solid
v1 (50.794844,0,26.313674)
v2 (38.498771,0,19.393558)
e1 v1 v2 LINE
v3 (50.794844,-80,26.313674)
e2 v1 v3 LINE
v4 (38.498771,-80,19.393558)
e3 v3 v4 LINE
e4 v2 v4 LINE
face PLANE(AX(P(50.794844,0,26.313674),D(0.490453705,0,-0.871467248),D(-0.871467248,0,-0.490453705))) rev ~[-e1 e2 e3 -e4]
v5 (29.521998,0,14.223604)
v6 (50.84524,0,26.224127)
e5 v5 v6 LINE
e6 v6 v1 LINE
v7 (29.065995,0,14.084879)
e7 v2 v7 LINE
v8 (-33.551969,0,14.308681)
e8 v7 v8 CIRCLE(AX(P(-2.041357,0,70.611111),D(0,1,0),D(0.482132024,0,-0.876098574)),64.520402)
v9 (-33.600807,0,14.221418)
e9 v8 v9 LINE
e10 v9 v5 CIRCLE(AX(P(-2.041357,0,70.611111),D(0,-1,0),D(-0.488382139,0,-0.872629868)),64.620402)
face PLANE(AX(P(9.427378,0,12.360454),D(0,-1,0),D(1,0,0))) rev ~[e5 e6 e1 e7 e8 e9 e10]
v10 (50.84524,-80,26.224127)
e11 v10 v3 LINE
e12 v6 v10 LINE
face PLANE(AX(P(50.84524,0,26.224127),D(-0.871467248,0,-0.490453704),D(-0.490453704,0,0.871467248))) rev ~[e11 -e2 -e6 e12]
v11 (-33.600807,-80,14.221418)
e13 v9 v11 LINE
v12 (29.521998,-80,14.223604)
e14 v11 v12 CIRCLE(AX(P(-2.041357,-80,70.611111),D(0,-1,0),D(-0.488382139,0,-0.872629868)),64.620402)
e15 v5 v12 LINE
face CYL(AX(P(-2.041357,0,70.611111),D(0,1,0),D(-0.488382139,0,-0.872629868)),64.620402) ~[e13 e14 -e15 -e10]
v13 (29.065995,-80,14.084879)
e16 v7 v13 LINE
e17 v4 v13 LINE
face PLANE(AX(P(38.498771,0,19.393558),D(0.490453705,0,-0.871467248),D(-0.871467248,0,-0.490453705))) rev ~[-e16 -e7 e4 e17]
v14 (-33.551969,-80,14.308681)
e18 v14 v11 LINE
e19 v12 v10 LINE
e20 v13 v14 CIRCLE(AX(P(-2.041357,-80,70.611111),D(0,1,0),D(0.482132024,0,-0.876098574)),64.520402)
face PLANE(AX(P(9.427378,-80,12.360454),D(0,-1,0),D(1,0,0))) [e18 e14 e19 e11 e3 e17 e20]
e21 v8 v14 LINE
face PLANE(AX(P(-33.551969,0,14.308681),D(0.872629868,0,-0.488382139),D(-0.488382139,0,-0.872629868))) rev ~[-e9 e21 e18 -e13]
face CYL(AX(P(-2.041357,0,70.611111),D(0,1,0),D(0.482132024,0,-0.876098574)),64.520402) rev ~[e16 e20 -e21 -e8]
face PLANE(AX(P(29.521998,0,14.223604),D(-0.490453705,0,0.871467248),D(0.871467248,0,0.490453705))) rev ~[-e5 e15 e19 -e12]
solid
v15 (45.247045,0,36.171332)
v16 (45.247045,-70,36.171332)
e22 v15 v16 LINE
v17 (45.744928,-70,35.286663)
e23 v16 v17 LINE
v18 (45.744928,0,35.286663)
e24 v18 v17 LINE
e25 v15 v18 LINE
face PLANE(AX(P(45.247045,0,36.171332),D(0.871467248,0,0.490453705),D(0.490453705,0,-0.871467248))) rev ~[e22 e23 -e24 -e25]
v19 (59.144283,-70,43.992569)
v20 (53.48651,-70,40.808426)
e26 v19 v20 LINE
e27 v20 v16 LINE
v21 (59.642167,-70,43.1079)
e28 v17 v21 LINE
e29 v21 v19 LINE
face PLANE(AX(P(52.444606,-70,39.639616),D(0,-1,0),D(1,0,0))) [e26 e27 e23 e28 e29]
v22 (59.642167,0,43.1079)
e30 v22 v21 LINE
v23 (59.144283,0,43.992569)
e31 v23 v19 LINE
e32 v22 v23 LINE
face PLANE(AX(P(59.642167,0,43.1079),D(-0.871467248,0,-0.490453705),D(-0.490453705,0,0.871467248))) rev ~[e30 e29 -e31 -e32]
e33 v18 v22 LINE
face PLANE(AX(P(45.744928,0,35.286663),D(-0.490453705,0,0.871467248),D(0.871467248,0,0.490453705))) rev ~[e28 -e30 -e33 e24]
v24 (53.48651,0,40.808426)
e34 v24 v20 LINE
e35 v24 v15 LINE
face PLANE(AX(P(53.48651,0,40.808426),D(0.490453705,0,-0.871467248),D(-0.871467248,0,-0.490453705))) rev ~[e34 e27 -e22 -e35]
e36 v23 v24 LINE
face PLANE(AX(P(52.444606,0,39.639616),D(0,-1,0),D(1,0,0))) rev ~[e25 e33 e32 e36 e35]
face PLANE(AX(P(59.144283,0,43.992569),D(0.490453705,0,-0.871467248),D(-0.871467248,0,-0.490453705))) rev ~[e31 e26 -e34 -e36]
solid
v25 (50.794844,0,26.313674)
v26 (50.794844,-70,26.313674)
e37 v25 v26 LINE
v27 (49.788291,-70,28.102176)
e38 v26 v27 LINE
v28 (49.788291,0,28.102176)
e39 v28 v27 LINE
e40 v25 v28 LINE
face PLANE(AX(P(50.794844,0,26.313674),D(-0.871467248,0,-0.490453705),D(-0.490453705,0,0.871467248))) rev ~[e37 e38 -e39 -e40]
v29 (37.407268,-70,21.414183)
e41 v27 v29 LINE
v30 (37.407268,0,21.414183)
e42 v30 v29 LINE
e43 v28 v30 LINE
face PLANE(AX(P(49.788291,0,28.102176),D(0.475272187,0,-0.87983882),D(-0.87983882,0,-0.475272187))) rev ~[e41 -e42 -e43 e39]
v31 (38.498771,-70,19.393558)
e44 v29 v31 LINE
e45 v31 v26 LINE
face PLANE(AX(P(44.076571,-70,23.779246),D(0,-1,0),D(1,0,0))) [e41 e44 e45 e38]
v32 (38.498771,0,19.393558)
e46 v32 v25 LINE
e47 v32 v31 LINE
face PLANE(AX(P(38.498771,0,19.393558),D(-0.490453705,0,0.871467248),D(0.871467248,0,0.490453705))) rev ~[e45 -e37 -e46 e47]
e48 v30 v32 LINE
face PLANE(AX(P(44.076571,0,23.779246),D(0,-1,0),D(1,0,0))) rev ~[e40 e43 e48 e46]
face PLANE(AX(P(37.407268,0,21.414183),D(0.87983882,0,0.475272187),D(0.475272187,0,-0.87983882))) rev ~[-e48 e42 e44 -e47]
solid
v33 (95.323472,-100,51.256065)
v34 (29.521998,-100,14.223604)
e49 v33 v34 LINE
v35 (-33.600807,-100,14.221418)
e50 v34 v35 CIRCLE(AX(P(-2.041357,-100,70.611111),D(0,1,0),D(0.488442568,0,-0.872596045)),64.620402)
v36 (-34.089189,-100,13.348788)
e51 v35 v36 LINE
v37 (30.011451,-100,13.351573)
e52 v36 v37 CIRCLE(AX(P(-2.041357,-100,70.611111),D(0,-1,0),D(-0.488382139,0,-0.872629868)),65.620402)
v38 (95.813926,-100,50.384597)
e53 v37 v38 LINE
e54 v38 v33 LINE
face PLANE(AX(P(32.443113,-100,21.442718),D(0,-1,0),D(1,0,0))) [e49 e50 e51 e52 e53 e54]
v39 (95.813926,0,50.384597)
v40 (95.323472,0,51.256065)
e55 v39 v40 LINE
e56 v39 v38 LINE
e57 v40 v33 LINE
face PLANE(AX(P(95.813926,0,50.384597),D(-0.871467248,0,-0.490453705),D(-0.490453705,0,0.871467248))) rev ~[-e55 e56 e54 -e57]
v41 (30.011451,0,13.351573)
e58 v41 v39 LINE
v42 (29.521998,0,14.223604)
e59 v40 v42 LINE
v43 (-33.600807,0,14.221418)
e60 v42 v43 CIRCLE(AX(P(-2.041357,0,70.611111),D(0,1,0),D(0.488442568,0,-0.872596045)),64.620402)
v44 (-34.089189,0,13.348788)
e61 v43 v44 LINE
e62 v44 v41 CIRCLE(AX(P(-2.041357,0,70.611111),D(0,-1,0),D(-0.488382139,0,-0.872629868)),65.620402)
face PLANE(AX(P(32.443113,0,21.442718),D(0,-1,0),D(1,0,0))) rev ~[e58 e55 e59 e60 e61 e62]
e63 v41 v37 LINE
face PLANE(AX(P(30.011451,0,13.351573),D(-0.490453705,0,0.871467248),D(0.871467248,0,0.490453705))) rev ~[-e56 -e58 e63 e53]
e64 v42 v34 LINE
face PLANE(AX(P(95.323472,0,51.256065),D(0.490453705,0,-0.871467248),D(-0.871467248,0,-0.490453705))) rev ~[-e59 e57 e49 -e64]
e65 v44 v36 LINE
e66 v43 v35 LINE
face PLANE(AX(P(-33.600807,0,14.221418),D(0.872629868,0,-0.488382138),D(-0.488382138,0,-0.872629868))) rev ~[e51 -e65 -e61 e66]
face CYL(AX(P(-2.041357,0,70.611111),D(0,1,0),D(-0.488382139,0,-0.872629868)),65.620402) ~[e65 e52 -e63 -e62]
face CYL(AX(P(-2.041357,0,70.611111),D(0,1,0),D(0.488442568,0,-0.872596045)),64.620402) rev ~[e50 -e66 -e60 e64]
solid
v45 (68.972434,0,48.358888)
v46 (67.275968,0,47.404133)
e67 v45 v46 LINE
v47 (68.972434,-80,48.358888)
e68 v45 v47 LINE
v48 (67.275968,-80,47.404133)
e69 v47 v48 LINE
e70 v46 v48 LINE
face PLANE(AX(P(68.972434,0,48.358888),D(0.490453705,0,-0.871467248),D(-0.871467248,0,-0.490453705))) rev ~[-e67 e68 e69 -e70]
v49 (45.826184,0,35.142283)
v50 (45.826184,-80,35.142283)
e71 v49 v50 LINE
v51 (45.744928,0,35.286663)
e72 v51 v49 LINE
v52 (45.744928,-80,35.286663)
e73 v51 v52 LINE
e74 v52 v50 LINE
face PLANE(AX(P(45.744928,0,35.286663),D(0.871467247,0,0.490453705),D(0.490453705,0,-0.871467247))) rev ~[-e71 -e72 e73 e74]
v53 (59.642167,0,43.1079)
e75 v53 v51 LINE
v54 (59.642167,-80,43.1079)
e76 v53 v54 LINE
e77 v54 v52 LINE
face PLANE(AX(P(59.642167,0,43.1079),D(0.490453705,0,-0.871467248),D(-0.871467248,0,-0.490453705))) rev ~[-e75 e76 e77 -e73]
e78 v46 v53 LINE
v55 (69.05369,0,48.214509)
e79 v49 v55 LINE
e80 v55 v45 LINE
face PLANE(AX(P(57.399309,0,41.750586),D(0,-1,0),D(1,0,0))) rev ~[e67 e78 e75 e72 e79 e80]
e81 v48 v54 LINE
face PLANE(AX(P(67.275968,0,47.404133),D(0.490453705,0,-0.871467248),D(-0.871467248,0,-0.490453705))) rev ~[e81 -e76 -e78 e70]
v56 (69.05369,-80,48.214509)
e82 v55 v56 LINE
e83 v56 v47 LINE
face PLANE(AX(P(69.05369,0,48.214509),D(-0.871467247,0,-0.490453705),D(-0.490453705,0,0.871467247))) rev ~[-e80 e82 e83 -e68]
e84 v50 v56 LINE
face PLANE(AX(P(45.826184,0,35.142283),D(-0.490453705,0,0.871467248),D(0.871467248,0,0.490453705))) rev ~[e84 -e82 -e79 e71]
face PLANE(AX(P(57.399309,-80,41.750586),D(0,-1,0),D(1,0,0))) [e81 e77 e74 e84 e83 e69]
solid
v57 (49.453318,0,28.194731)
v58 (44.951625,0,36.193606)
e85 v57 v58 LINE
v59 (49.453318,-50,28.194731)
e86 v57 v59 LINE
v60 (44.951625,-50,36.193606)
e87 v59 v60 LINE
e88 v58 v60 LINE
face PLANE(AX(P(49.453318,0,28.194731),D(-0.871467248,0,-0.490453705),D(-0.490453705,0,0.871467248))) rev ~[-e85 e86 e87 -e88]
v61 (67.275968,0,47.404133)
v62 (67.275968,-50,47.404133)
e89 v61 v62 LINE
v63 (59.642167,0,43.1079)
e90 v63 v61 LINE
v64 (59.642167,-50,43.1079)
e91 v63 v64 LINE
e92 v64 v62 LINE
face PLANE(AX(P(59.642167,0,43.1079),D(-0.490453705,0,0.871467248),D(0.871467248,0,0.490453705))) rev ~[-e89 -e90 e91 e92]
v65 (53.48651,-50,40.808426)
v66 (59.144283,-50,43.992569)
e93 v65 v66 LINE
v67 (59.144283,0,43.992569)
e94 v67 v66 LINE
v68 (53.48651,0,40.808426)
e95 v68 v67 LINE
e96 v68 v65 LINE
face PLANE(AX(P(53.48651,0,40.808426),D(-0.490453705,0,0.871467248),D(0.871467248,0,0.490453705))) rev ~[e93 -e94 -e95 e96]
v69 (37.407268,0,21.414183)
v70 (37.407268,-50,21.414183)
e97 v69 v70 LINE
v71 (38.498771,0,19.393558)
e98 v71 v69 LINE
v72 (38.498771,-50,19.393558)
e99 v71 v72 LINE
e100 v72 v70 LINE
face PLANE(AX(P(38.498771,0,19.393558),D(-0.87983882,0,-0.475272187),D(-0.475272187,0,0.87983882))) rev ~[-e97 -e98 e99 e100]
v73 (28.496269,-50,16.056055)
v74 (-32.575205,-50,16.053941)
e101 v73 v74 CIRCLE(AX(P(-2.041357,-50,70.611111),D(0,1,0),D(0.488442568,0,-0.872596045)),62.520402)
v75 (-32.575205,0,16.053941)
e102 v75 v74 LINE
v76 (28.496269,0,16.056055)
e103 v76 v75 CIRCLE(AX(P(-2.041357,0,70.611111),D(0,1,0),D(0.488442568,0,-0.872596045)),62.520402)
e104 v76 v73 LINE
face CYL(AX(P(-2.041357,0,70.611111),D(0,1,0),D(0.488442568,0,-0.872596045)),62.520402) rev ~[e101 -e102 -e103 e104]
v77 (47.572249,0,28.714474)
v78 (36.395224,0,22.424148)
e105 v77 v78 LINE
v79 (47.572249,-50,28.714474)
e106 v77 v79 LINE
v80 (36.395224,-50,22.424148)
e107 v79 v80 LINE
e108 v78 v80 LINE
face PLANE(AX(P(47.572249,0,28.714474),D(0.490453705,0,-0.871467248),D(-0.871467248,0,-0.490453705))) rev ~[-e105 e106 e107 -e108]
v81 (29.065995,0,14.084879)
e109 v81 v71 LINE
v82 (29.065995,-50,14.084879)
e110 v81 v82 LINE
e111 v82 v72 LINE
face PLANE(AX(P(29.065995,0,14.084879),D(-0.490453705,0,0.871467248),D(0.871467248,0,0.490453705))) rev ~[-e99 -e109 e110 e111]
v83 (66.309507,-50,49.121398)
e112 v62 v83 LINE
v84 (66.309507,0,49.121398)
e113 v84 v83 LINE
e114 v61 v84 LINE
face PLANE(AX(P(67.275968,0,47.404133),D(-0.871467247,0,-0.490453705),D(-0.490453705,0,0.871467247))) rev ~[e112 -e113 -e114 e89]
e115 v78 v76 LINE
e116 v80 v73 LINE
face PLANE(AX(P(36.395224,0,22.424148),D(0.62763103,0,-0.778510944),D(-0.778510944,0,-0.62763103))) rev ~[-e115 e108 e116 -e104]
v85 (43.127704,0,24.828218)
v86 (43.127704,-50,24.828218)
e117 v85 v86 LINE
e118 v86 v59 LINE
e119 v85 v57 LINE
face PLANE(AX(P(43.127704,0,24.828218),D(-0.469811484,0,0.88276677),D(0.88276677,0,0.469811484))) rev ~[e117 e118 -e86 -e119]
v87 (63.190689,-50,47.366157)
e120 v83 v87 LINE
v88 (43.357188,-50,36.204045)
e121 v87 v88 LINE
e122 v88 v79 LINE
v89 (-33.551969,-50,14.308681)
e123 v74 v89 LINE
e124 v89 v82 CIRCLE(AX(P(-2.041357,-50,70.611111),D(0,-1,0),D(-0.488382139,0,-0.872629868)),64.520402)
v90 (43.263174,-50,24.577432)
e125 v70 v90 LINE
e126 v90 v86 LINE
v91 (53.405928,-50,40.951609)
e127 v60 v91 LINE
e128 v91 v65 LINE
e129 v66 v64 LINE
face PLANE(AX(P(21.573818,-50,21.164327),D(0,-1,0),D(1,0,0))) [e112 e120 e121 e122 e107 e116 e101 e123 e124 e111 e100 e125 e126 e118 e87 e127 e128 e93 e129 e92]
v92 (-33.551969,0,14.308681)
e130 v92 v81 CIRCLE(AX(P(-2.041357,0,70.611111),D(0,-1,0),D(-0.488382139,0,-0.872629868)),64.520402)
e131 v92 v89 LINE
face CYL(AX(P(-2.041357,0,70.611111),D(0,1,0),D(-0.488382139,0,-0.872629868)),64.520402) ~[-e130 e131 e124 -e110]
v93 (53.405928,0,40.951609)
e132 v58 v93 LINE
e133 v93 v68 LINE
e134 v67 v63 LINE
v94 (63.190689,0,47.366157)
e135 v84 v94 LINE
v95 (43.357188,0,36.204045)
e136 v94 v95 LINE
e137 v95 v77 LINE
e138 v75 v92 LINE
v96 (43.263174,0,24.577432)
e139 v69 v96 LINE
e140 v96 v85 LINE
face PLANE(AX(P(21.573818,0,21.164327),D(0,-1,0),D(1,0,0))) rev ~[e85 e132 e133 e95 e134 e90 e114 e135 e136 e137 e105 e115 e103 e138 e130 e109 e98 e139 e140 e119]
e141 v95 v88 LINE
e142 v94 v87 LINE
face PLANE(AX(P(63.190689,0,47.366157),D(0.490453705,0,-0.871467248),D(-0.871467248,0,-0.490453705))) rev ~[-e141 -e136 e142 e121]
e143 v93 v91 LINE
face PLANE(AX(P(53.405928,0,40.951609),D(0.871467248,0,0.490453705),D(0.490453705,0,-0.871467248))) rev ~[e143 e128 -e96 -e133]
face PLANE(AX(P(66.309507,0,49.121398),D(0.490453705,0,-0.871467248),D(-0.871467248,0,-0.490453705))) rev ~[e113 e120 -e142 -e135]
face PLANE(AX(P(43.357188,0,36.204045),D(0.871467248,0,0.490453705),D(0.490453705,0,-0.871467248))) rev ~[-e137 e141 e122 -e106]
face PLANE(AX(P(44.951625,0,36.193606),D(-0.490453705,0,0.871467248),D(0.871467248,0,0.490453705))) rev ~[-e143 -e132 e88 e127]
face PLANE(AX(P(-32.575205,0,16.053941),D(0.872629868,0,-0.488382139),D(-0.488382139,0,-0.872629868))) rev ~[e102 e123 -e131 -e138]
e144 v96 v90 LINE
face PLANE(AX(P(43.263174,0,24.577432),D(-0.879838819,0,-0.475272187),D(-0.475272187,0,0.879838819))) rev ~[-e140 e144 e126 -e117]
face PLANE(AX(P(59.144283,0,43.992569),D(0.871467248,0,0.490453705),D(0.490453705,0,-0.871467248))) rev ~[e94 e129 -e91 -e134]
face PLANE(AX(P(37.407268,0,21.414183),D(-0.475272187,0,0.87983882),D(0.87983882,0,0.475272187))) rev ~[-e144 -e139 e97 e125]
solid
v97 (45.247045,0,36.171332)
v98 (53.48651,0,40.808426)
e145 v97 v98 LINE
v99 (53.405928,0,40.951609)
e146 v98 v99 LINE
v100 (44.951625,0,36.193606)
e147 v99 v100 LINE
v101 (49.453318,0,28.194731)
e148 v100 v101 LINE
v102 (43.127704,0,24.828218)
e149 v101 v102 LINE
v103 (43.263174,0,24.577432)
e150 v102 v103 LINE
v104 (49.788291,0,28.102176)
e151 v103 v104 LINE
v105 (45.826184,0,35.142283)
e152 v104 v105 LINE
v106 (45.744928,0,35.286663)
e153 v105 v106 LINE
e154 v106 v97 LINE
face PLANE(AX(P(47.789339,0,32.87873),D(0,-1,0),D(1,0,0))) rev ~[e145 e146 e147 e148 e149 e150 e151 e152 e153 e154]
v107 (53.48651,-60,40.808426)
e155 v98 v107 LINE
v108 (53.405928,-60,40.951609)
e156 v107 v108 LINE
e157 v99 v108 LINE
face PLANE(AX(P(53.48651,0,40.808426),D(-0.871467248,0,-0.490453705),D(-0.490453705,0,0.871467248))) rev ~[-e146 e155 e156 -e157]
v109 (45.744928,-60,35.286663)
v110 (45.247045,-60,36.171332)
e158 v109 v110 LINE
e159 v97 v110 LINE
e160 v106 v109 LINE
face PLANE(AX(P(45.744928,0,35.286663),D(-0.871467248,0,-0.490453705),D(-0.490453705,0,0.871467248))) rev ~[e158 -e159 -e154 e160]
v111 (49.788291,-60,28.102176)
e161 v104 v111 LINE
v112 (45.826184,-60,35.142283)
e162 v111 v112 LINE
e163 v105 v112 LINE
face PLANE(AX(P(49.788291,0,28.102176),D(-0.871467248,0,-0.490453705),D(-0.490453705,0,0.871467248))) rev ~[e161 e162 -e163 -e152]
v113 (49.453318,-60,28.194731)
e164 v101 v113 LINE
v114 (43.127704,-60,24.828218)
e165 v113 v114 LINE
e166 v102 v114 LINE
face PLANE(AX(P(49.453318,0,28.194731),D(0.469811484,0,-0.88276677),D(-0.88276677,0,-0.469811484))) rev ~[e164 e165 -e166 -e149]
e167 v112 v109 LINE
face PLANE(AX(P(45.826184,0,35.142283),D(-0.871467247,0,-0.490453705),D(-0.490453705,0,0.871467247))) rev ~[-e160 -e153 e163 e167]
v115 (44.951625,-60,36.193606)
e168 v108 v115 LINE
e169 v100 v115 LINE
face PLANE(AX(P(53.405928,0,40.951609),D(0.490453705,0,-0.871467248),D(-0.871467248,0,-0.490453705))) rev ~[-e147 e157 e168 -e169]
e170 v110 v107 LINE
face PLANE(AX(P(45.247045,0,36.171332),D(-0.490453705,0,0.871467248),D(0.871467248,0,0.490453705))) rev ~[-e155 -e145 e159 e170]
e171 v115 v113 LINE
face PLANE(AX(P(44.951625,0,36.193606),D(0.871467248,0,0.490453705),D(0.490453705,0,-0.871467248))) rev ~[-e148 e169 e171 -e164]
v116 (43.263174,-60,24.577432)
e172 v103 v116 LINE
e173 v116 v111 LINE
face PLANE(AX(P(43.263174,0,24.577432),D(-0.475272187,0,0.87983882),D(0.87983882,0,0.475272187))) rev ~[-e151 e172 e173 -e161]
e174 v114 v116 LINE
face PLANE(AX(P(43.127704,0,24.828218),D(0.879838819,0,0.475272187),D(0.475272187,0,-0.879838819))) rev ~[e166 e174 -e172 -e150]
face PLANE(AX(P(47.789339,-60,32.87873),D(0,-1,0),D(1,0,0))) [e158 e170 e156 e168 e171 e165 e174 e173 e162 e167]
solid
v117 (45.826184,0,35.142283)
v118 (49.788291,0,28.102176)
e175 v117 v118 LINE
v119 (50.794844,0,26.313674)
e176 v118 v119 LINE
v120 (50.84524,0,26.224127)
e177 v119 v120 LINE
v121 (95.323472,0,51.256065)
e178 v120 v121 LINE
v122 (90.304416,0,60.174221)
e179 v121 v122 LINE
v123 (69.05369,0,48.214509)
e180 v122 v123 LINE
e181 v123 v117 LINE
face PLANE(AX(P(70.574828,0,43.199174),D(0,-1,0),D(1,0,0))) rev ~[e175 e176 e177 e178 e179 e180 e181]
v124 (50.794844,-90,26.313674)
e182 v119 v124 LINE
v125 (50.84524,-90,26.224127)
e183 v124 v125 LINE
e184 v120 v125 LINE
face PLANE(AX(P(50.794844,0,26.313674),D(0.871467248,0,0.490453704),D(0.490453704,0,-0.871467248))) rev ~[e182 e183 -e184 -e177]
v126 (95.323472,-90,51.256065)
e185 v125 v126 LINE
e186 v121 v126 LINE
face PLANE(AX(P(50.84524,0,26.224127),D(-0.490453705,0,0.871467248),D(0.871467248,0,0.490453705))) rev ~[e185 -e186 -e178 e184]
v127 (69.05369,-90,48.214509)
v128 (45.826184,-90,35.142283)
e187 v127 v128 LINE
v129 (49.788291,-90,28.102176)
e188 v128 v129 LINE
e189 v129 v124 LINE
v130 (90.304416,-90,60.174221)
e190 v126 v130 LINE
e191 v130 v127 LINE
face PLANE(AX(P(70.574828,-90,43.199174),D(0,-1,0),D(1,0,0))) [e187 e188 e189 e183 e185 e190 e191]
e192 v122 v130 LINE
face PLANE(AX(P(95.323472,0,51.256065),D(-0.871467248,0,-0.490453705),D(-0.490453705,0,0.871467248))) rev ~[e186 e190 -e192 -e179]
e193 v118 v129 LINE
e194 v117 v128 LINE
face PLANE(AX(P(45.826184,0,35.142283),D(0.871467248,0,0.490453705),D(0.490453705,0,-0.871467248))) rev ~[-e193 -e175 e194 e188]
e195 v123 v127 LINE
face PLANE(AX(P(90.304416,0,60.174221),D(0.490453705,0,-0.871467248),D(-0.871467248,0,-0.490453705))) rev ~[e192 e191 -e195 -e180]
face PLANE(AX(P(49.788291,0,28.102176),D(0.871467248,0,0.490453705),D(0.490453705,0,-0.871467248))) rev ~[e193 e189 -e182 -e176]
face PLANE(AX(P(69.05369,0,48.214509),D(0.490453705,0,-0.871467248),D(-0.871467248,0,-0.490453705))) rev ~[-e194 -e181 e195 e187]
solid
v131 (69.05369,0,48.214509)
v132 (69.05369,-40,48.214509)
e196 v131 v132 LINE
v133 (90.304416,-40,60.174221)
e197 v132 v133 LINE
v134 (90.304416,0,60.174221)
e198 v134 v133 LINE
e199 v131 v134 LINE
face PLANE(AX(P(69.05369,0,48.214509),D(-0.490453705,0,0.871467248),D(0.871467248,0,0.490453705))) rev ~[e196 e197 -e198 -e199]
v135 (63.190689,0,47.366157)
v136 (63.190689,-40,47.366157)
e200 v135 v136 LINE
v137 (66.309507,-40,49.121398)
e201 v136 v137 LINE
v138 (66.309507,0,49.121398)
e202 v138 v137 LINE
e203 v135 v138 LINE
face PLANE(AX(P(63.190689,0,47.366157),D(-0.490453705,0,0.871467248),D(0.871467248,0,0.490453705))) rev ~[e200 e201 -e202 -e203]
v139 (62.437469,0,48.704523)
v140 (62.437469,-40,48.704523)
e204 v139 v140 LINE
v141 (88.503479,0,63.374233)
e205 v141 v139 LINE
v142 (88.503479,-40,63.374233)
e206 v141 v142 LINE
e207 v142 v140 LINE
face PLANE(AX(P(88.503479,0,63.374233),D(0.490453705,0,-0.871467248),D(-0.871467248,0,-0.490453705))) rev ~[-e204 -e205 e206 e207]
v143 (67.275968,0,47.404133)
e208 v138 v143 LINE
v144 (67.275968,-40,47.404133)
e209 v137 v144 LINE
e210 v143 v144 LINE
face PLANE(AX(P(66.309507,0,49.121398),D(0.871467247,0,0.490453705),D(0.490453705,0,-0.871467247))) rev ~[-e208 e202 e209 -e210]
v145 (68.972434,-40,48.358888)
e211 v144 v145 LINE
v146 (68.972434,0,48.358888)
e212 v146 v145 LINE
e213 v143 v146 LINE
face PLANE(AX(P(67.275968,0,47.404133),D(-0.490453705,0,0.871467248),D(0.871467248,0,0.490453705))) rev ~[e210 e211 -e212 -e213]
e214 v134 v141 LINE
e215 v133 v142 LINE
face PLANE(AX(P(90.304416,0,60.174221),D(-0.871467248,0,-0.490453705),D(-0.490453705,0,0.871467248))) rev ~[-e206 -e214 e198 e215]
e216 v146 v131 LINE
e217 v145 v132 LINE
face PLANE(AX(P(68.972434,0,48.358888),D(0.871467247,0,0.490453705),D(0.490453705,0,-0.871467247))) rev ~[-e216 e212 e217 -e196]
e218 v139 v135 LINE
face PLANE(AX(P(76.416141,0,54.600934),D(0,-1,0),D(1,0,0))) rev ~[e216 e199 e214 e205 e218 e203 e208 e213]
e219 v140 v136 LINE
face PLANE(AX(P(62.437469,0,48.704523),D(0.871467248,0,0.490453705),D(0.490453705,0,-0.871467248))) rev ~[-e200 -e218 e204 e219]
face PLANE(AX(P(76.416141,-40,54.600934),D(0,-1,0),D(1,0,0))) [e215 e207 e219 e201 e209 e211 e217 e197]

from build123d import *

# Parameters (mm, degrees)
F1_DEPTH = 100
F2_DEPTH = 90
F3_DEPTH = 80
F4_DEPTH = 80
F5_DEPTH = 70
F6_DEPTH = 60
F7_DEPTH = 50
F8_DEPTH = 40


with BuildPart() as f1:
    # F0 (on Front) → F1 (new body)
    with BuildSketch(Plane.XZ):
        with BuildLine():
            Line((50.8452397293, 26.2241268437), (29.5219979318, 14.223603626))
            ThreePointArc((29.5219979318, 14.223603626), (-2.0391196005, 5.9907088835), (-33.6008071966, 14.221417955))
            Line((-33.6008071966, 14.221417955), (-34.0891893351, 13.3487880868))
            ThreePointArc((-34.0891893351, 13.3487880868), (-2.0385061949, 4.9907089067), (30.0114505771, 13.3515729915))
            Line((30.0114505771, 13.3515729915), (95.813926037, 50.3845974272))
            Line((95.813926037, 50.3845974272), (95.3234723322, 51.2560646748))
            Line((95.3234723322, 51.2560646748), (50.8452397293, 26.2241268437))
        make_face()
    extrude(amount=F1_DEPTH)


with BuildPart() as f2:
    # F0 (on Front) → F2 (new body)
    with BuildSketch(Plane.XZ):
        Polygon((50.7948435843, 26.3136737049), (50.8452397293, 26.2241268437), (95.3234723322, 51.2560646748), (90.3044164077, 60.1742210862), (69.0536898036, 48.2145087485), (45.8261838048, 35.1422832552), (49.7882909537, 28.1021761505), align=None)
    extrude(amount=F2_DEPTH)


with BuildPart() as f3:
    # F0 (on Front) → F3 (new body)
    with BuildSketch(Plane.XZ):
        with BuildLine():
            ThreePointArc((-33.6008071966, 14.221417955), (-2.0391196005, 5.9907088835), (29.5219979318, 14.223603626))
            Line((29.5219979318, 14.223603626), (50.8452397293, 26.2241268437))
            Line((50.8452397293, 26.2241268437), (50.7948435843, 26.3136737049))
            Line((50.7948435843, 26.3136737049), (38.4987711206, 19.393557876))
            Line((38.4987711206, 19.393557876), (29.0659948309, 14.0848786448))
            ThreePointArc((29.0659948309, 14.0848786448), (-2.2719574378, 6.0911209367), (-33.5519689827, 14.3086809418))
            Line((-33.5519689827, 14.3086809418), (-33.6008071966, 14.221417955))
        make_face()
    extrude(amount=F3_DEPTH)


with BuildPart() as f4:
    # F0 (on Front) → F4 (new body)
    with BuildSketch(Plane.XZ):
        Polygon((45.8261838048, 35.1422832552), (69.0536898036, 48.2145087485), (68.9724342199, 48.3588884915), (67.2759677307, 47.4041328458), (59.6421667017, 43.1079002486), (45.7449282211, 35.2866629982), align=None)
    extrude(amount=F4_DEPTH)


with BuildPart() as f5:
    # F0 (on Front) → F5 (new body)
    with BuildSketch(Plane.XZ):
        Polygon((38.4987711206, 19.393557876), (50.7948435843, 26.3136737049), (49.7882909537, 28.1021761505), (43.2631740892, 24.5774321962), (37.4072678387, 21.4141830802), align=None)
    extrude(amount=F5_DEPTH)


with BuildPart() as f5b:
    # F0 (on Front) → F5, piece 2 (new body)
    with BuildSketch(Plane.XZ):
        Polygon((45.2470448009, 36.1713318051), (45.7449282211, 35.2866629982), (59.6421667017, 43.1079002486), (59.1442832815, 43.9925690556), (53.4865097086, 40.8084264301), align=None)
    extrude(amount=F5_DEPTH)


with BuildPart() as f6:
    # F0 (on Front) → F6 (new body)
    with BuildSketch(Plane.XZ):
        Polygon((43.2631740892, 24.5774321962), (49.7882909537, 28.1021761505), (45.8261838048, 35.1422832552), (45.7449282211, 35.2866629982), (45.2470448009, 36.1713318051), (53.4865097086, 40.8084264301), (53.4059276803, 40.95160936), (44.9516252368, 36.1936061575), (49.453318119, 28.1947311014), (43.1277044117, 24.8282179236), align=None)
    extrude(amount=F6_DEPTH)


with BuildPart() as f7:
    # F0 (on Front) → F7 (new body)
    with BuildSketch(Plane.XZ):
        with BuildLine():
            Line((-32.5752047057, 16.0539406781), (-33.5519689827, 14.3086809418))
            ThreePointArc((-33.5519689827, 14.3086809418), (-2.2719574378, 6.0911209367), (29.0659948309, 14.0848786448))
            Line((29.0659948309, 14.0848786448), (38.4987711206, 19.393557876))
            Line((38.4987711206, 19.393557876), (37.4072678387, 21.4141830802))
            Line((37.4072678387, 21.4141830802), (43.2631740892, 24.5774321962))
            Line((43.2631740892, 24.5774321962), (43.1277044117, 24.8282179236))
            Line((43.1277044117, 24.8282179236), (49.453318119, 28.1947311014))
            Line((49.453318119, 28.1947311014), (44.9516252368, 36.1936061575))
            Line((44.9516252368, 36.1936061575), (53.4059276803, 40.95160936))
            Line((53.4059276803, 40.95160936), (53.4865097086, 40.8084264301))
            Line((53.4865097086, 40.8084264301), (59.1442832815, 43.9925690556))
            Line((59.1442832815, 43.9925690556), (59.6421667017, 43.1079002486))
            Line((59.6421667017, 43.1079002486), (67.2759677307, 47.4041328458))
            Line((67.2759677307, 47.4041328458), (66.3095066613, 49.1213982263))
            Line((66.3095066613, 49.1213982263), (63.190689116, 47.3661565647))
            Line((63.190689116, 47.3661565647), (43.3571876206, 36.2040454072))
            Line((43.3571876206, 36.2040454072), (47.5722491088, 28.7144740215))
            Line((47.5722491088, 28.7144740215), (36.3952242818, 22.4241478499))
            Line((36.3952242818, 22.4241478499), (28.4962685386, 16.0560553203))
            ThreePointArc((28.4962685386, 16.0560553203), (-2.0391923145, 8.0907088823), (-32.5752047057, 16.0539406781))
        make_face()
    extrude(amount=F7_DEPTH)


with BuildPart() as f8:
    # F0 (on Front) → F8 (new body)
    with BuildSketch(Plane.XZ):
        Polygon((69.0536898036, 48.2145087485), (90.3044164077, 60.1742210862), (88.5034794178, 63.3742328025), (62.4374687791, 48.7045231575), (63.190689116, 47.3661565647), (66.3095066613, 49.1213982263), (67.2759677307, 47.4041328458), (68.9724342199, 48.3588884915), align=None)
    extrude(amount=F8_DEPTH)


solid = Compound([f1.part, f2.part, f3.part, f4.part, f5.part, f5b.part, f6.part, f7.part, f8.part])
